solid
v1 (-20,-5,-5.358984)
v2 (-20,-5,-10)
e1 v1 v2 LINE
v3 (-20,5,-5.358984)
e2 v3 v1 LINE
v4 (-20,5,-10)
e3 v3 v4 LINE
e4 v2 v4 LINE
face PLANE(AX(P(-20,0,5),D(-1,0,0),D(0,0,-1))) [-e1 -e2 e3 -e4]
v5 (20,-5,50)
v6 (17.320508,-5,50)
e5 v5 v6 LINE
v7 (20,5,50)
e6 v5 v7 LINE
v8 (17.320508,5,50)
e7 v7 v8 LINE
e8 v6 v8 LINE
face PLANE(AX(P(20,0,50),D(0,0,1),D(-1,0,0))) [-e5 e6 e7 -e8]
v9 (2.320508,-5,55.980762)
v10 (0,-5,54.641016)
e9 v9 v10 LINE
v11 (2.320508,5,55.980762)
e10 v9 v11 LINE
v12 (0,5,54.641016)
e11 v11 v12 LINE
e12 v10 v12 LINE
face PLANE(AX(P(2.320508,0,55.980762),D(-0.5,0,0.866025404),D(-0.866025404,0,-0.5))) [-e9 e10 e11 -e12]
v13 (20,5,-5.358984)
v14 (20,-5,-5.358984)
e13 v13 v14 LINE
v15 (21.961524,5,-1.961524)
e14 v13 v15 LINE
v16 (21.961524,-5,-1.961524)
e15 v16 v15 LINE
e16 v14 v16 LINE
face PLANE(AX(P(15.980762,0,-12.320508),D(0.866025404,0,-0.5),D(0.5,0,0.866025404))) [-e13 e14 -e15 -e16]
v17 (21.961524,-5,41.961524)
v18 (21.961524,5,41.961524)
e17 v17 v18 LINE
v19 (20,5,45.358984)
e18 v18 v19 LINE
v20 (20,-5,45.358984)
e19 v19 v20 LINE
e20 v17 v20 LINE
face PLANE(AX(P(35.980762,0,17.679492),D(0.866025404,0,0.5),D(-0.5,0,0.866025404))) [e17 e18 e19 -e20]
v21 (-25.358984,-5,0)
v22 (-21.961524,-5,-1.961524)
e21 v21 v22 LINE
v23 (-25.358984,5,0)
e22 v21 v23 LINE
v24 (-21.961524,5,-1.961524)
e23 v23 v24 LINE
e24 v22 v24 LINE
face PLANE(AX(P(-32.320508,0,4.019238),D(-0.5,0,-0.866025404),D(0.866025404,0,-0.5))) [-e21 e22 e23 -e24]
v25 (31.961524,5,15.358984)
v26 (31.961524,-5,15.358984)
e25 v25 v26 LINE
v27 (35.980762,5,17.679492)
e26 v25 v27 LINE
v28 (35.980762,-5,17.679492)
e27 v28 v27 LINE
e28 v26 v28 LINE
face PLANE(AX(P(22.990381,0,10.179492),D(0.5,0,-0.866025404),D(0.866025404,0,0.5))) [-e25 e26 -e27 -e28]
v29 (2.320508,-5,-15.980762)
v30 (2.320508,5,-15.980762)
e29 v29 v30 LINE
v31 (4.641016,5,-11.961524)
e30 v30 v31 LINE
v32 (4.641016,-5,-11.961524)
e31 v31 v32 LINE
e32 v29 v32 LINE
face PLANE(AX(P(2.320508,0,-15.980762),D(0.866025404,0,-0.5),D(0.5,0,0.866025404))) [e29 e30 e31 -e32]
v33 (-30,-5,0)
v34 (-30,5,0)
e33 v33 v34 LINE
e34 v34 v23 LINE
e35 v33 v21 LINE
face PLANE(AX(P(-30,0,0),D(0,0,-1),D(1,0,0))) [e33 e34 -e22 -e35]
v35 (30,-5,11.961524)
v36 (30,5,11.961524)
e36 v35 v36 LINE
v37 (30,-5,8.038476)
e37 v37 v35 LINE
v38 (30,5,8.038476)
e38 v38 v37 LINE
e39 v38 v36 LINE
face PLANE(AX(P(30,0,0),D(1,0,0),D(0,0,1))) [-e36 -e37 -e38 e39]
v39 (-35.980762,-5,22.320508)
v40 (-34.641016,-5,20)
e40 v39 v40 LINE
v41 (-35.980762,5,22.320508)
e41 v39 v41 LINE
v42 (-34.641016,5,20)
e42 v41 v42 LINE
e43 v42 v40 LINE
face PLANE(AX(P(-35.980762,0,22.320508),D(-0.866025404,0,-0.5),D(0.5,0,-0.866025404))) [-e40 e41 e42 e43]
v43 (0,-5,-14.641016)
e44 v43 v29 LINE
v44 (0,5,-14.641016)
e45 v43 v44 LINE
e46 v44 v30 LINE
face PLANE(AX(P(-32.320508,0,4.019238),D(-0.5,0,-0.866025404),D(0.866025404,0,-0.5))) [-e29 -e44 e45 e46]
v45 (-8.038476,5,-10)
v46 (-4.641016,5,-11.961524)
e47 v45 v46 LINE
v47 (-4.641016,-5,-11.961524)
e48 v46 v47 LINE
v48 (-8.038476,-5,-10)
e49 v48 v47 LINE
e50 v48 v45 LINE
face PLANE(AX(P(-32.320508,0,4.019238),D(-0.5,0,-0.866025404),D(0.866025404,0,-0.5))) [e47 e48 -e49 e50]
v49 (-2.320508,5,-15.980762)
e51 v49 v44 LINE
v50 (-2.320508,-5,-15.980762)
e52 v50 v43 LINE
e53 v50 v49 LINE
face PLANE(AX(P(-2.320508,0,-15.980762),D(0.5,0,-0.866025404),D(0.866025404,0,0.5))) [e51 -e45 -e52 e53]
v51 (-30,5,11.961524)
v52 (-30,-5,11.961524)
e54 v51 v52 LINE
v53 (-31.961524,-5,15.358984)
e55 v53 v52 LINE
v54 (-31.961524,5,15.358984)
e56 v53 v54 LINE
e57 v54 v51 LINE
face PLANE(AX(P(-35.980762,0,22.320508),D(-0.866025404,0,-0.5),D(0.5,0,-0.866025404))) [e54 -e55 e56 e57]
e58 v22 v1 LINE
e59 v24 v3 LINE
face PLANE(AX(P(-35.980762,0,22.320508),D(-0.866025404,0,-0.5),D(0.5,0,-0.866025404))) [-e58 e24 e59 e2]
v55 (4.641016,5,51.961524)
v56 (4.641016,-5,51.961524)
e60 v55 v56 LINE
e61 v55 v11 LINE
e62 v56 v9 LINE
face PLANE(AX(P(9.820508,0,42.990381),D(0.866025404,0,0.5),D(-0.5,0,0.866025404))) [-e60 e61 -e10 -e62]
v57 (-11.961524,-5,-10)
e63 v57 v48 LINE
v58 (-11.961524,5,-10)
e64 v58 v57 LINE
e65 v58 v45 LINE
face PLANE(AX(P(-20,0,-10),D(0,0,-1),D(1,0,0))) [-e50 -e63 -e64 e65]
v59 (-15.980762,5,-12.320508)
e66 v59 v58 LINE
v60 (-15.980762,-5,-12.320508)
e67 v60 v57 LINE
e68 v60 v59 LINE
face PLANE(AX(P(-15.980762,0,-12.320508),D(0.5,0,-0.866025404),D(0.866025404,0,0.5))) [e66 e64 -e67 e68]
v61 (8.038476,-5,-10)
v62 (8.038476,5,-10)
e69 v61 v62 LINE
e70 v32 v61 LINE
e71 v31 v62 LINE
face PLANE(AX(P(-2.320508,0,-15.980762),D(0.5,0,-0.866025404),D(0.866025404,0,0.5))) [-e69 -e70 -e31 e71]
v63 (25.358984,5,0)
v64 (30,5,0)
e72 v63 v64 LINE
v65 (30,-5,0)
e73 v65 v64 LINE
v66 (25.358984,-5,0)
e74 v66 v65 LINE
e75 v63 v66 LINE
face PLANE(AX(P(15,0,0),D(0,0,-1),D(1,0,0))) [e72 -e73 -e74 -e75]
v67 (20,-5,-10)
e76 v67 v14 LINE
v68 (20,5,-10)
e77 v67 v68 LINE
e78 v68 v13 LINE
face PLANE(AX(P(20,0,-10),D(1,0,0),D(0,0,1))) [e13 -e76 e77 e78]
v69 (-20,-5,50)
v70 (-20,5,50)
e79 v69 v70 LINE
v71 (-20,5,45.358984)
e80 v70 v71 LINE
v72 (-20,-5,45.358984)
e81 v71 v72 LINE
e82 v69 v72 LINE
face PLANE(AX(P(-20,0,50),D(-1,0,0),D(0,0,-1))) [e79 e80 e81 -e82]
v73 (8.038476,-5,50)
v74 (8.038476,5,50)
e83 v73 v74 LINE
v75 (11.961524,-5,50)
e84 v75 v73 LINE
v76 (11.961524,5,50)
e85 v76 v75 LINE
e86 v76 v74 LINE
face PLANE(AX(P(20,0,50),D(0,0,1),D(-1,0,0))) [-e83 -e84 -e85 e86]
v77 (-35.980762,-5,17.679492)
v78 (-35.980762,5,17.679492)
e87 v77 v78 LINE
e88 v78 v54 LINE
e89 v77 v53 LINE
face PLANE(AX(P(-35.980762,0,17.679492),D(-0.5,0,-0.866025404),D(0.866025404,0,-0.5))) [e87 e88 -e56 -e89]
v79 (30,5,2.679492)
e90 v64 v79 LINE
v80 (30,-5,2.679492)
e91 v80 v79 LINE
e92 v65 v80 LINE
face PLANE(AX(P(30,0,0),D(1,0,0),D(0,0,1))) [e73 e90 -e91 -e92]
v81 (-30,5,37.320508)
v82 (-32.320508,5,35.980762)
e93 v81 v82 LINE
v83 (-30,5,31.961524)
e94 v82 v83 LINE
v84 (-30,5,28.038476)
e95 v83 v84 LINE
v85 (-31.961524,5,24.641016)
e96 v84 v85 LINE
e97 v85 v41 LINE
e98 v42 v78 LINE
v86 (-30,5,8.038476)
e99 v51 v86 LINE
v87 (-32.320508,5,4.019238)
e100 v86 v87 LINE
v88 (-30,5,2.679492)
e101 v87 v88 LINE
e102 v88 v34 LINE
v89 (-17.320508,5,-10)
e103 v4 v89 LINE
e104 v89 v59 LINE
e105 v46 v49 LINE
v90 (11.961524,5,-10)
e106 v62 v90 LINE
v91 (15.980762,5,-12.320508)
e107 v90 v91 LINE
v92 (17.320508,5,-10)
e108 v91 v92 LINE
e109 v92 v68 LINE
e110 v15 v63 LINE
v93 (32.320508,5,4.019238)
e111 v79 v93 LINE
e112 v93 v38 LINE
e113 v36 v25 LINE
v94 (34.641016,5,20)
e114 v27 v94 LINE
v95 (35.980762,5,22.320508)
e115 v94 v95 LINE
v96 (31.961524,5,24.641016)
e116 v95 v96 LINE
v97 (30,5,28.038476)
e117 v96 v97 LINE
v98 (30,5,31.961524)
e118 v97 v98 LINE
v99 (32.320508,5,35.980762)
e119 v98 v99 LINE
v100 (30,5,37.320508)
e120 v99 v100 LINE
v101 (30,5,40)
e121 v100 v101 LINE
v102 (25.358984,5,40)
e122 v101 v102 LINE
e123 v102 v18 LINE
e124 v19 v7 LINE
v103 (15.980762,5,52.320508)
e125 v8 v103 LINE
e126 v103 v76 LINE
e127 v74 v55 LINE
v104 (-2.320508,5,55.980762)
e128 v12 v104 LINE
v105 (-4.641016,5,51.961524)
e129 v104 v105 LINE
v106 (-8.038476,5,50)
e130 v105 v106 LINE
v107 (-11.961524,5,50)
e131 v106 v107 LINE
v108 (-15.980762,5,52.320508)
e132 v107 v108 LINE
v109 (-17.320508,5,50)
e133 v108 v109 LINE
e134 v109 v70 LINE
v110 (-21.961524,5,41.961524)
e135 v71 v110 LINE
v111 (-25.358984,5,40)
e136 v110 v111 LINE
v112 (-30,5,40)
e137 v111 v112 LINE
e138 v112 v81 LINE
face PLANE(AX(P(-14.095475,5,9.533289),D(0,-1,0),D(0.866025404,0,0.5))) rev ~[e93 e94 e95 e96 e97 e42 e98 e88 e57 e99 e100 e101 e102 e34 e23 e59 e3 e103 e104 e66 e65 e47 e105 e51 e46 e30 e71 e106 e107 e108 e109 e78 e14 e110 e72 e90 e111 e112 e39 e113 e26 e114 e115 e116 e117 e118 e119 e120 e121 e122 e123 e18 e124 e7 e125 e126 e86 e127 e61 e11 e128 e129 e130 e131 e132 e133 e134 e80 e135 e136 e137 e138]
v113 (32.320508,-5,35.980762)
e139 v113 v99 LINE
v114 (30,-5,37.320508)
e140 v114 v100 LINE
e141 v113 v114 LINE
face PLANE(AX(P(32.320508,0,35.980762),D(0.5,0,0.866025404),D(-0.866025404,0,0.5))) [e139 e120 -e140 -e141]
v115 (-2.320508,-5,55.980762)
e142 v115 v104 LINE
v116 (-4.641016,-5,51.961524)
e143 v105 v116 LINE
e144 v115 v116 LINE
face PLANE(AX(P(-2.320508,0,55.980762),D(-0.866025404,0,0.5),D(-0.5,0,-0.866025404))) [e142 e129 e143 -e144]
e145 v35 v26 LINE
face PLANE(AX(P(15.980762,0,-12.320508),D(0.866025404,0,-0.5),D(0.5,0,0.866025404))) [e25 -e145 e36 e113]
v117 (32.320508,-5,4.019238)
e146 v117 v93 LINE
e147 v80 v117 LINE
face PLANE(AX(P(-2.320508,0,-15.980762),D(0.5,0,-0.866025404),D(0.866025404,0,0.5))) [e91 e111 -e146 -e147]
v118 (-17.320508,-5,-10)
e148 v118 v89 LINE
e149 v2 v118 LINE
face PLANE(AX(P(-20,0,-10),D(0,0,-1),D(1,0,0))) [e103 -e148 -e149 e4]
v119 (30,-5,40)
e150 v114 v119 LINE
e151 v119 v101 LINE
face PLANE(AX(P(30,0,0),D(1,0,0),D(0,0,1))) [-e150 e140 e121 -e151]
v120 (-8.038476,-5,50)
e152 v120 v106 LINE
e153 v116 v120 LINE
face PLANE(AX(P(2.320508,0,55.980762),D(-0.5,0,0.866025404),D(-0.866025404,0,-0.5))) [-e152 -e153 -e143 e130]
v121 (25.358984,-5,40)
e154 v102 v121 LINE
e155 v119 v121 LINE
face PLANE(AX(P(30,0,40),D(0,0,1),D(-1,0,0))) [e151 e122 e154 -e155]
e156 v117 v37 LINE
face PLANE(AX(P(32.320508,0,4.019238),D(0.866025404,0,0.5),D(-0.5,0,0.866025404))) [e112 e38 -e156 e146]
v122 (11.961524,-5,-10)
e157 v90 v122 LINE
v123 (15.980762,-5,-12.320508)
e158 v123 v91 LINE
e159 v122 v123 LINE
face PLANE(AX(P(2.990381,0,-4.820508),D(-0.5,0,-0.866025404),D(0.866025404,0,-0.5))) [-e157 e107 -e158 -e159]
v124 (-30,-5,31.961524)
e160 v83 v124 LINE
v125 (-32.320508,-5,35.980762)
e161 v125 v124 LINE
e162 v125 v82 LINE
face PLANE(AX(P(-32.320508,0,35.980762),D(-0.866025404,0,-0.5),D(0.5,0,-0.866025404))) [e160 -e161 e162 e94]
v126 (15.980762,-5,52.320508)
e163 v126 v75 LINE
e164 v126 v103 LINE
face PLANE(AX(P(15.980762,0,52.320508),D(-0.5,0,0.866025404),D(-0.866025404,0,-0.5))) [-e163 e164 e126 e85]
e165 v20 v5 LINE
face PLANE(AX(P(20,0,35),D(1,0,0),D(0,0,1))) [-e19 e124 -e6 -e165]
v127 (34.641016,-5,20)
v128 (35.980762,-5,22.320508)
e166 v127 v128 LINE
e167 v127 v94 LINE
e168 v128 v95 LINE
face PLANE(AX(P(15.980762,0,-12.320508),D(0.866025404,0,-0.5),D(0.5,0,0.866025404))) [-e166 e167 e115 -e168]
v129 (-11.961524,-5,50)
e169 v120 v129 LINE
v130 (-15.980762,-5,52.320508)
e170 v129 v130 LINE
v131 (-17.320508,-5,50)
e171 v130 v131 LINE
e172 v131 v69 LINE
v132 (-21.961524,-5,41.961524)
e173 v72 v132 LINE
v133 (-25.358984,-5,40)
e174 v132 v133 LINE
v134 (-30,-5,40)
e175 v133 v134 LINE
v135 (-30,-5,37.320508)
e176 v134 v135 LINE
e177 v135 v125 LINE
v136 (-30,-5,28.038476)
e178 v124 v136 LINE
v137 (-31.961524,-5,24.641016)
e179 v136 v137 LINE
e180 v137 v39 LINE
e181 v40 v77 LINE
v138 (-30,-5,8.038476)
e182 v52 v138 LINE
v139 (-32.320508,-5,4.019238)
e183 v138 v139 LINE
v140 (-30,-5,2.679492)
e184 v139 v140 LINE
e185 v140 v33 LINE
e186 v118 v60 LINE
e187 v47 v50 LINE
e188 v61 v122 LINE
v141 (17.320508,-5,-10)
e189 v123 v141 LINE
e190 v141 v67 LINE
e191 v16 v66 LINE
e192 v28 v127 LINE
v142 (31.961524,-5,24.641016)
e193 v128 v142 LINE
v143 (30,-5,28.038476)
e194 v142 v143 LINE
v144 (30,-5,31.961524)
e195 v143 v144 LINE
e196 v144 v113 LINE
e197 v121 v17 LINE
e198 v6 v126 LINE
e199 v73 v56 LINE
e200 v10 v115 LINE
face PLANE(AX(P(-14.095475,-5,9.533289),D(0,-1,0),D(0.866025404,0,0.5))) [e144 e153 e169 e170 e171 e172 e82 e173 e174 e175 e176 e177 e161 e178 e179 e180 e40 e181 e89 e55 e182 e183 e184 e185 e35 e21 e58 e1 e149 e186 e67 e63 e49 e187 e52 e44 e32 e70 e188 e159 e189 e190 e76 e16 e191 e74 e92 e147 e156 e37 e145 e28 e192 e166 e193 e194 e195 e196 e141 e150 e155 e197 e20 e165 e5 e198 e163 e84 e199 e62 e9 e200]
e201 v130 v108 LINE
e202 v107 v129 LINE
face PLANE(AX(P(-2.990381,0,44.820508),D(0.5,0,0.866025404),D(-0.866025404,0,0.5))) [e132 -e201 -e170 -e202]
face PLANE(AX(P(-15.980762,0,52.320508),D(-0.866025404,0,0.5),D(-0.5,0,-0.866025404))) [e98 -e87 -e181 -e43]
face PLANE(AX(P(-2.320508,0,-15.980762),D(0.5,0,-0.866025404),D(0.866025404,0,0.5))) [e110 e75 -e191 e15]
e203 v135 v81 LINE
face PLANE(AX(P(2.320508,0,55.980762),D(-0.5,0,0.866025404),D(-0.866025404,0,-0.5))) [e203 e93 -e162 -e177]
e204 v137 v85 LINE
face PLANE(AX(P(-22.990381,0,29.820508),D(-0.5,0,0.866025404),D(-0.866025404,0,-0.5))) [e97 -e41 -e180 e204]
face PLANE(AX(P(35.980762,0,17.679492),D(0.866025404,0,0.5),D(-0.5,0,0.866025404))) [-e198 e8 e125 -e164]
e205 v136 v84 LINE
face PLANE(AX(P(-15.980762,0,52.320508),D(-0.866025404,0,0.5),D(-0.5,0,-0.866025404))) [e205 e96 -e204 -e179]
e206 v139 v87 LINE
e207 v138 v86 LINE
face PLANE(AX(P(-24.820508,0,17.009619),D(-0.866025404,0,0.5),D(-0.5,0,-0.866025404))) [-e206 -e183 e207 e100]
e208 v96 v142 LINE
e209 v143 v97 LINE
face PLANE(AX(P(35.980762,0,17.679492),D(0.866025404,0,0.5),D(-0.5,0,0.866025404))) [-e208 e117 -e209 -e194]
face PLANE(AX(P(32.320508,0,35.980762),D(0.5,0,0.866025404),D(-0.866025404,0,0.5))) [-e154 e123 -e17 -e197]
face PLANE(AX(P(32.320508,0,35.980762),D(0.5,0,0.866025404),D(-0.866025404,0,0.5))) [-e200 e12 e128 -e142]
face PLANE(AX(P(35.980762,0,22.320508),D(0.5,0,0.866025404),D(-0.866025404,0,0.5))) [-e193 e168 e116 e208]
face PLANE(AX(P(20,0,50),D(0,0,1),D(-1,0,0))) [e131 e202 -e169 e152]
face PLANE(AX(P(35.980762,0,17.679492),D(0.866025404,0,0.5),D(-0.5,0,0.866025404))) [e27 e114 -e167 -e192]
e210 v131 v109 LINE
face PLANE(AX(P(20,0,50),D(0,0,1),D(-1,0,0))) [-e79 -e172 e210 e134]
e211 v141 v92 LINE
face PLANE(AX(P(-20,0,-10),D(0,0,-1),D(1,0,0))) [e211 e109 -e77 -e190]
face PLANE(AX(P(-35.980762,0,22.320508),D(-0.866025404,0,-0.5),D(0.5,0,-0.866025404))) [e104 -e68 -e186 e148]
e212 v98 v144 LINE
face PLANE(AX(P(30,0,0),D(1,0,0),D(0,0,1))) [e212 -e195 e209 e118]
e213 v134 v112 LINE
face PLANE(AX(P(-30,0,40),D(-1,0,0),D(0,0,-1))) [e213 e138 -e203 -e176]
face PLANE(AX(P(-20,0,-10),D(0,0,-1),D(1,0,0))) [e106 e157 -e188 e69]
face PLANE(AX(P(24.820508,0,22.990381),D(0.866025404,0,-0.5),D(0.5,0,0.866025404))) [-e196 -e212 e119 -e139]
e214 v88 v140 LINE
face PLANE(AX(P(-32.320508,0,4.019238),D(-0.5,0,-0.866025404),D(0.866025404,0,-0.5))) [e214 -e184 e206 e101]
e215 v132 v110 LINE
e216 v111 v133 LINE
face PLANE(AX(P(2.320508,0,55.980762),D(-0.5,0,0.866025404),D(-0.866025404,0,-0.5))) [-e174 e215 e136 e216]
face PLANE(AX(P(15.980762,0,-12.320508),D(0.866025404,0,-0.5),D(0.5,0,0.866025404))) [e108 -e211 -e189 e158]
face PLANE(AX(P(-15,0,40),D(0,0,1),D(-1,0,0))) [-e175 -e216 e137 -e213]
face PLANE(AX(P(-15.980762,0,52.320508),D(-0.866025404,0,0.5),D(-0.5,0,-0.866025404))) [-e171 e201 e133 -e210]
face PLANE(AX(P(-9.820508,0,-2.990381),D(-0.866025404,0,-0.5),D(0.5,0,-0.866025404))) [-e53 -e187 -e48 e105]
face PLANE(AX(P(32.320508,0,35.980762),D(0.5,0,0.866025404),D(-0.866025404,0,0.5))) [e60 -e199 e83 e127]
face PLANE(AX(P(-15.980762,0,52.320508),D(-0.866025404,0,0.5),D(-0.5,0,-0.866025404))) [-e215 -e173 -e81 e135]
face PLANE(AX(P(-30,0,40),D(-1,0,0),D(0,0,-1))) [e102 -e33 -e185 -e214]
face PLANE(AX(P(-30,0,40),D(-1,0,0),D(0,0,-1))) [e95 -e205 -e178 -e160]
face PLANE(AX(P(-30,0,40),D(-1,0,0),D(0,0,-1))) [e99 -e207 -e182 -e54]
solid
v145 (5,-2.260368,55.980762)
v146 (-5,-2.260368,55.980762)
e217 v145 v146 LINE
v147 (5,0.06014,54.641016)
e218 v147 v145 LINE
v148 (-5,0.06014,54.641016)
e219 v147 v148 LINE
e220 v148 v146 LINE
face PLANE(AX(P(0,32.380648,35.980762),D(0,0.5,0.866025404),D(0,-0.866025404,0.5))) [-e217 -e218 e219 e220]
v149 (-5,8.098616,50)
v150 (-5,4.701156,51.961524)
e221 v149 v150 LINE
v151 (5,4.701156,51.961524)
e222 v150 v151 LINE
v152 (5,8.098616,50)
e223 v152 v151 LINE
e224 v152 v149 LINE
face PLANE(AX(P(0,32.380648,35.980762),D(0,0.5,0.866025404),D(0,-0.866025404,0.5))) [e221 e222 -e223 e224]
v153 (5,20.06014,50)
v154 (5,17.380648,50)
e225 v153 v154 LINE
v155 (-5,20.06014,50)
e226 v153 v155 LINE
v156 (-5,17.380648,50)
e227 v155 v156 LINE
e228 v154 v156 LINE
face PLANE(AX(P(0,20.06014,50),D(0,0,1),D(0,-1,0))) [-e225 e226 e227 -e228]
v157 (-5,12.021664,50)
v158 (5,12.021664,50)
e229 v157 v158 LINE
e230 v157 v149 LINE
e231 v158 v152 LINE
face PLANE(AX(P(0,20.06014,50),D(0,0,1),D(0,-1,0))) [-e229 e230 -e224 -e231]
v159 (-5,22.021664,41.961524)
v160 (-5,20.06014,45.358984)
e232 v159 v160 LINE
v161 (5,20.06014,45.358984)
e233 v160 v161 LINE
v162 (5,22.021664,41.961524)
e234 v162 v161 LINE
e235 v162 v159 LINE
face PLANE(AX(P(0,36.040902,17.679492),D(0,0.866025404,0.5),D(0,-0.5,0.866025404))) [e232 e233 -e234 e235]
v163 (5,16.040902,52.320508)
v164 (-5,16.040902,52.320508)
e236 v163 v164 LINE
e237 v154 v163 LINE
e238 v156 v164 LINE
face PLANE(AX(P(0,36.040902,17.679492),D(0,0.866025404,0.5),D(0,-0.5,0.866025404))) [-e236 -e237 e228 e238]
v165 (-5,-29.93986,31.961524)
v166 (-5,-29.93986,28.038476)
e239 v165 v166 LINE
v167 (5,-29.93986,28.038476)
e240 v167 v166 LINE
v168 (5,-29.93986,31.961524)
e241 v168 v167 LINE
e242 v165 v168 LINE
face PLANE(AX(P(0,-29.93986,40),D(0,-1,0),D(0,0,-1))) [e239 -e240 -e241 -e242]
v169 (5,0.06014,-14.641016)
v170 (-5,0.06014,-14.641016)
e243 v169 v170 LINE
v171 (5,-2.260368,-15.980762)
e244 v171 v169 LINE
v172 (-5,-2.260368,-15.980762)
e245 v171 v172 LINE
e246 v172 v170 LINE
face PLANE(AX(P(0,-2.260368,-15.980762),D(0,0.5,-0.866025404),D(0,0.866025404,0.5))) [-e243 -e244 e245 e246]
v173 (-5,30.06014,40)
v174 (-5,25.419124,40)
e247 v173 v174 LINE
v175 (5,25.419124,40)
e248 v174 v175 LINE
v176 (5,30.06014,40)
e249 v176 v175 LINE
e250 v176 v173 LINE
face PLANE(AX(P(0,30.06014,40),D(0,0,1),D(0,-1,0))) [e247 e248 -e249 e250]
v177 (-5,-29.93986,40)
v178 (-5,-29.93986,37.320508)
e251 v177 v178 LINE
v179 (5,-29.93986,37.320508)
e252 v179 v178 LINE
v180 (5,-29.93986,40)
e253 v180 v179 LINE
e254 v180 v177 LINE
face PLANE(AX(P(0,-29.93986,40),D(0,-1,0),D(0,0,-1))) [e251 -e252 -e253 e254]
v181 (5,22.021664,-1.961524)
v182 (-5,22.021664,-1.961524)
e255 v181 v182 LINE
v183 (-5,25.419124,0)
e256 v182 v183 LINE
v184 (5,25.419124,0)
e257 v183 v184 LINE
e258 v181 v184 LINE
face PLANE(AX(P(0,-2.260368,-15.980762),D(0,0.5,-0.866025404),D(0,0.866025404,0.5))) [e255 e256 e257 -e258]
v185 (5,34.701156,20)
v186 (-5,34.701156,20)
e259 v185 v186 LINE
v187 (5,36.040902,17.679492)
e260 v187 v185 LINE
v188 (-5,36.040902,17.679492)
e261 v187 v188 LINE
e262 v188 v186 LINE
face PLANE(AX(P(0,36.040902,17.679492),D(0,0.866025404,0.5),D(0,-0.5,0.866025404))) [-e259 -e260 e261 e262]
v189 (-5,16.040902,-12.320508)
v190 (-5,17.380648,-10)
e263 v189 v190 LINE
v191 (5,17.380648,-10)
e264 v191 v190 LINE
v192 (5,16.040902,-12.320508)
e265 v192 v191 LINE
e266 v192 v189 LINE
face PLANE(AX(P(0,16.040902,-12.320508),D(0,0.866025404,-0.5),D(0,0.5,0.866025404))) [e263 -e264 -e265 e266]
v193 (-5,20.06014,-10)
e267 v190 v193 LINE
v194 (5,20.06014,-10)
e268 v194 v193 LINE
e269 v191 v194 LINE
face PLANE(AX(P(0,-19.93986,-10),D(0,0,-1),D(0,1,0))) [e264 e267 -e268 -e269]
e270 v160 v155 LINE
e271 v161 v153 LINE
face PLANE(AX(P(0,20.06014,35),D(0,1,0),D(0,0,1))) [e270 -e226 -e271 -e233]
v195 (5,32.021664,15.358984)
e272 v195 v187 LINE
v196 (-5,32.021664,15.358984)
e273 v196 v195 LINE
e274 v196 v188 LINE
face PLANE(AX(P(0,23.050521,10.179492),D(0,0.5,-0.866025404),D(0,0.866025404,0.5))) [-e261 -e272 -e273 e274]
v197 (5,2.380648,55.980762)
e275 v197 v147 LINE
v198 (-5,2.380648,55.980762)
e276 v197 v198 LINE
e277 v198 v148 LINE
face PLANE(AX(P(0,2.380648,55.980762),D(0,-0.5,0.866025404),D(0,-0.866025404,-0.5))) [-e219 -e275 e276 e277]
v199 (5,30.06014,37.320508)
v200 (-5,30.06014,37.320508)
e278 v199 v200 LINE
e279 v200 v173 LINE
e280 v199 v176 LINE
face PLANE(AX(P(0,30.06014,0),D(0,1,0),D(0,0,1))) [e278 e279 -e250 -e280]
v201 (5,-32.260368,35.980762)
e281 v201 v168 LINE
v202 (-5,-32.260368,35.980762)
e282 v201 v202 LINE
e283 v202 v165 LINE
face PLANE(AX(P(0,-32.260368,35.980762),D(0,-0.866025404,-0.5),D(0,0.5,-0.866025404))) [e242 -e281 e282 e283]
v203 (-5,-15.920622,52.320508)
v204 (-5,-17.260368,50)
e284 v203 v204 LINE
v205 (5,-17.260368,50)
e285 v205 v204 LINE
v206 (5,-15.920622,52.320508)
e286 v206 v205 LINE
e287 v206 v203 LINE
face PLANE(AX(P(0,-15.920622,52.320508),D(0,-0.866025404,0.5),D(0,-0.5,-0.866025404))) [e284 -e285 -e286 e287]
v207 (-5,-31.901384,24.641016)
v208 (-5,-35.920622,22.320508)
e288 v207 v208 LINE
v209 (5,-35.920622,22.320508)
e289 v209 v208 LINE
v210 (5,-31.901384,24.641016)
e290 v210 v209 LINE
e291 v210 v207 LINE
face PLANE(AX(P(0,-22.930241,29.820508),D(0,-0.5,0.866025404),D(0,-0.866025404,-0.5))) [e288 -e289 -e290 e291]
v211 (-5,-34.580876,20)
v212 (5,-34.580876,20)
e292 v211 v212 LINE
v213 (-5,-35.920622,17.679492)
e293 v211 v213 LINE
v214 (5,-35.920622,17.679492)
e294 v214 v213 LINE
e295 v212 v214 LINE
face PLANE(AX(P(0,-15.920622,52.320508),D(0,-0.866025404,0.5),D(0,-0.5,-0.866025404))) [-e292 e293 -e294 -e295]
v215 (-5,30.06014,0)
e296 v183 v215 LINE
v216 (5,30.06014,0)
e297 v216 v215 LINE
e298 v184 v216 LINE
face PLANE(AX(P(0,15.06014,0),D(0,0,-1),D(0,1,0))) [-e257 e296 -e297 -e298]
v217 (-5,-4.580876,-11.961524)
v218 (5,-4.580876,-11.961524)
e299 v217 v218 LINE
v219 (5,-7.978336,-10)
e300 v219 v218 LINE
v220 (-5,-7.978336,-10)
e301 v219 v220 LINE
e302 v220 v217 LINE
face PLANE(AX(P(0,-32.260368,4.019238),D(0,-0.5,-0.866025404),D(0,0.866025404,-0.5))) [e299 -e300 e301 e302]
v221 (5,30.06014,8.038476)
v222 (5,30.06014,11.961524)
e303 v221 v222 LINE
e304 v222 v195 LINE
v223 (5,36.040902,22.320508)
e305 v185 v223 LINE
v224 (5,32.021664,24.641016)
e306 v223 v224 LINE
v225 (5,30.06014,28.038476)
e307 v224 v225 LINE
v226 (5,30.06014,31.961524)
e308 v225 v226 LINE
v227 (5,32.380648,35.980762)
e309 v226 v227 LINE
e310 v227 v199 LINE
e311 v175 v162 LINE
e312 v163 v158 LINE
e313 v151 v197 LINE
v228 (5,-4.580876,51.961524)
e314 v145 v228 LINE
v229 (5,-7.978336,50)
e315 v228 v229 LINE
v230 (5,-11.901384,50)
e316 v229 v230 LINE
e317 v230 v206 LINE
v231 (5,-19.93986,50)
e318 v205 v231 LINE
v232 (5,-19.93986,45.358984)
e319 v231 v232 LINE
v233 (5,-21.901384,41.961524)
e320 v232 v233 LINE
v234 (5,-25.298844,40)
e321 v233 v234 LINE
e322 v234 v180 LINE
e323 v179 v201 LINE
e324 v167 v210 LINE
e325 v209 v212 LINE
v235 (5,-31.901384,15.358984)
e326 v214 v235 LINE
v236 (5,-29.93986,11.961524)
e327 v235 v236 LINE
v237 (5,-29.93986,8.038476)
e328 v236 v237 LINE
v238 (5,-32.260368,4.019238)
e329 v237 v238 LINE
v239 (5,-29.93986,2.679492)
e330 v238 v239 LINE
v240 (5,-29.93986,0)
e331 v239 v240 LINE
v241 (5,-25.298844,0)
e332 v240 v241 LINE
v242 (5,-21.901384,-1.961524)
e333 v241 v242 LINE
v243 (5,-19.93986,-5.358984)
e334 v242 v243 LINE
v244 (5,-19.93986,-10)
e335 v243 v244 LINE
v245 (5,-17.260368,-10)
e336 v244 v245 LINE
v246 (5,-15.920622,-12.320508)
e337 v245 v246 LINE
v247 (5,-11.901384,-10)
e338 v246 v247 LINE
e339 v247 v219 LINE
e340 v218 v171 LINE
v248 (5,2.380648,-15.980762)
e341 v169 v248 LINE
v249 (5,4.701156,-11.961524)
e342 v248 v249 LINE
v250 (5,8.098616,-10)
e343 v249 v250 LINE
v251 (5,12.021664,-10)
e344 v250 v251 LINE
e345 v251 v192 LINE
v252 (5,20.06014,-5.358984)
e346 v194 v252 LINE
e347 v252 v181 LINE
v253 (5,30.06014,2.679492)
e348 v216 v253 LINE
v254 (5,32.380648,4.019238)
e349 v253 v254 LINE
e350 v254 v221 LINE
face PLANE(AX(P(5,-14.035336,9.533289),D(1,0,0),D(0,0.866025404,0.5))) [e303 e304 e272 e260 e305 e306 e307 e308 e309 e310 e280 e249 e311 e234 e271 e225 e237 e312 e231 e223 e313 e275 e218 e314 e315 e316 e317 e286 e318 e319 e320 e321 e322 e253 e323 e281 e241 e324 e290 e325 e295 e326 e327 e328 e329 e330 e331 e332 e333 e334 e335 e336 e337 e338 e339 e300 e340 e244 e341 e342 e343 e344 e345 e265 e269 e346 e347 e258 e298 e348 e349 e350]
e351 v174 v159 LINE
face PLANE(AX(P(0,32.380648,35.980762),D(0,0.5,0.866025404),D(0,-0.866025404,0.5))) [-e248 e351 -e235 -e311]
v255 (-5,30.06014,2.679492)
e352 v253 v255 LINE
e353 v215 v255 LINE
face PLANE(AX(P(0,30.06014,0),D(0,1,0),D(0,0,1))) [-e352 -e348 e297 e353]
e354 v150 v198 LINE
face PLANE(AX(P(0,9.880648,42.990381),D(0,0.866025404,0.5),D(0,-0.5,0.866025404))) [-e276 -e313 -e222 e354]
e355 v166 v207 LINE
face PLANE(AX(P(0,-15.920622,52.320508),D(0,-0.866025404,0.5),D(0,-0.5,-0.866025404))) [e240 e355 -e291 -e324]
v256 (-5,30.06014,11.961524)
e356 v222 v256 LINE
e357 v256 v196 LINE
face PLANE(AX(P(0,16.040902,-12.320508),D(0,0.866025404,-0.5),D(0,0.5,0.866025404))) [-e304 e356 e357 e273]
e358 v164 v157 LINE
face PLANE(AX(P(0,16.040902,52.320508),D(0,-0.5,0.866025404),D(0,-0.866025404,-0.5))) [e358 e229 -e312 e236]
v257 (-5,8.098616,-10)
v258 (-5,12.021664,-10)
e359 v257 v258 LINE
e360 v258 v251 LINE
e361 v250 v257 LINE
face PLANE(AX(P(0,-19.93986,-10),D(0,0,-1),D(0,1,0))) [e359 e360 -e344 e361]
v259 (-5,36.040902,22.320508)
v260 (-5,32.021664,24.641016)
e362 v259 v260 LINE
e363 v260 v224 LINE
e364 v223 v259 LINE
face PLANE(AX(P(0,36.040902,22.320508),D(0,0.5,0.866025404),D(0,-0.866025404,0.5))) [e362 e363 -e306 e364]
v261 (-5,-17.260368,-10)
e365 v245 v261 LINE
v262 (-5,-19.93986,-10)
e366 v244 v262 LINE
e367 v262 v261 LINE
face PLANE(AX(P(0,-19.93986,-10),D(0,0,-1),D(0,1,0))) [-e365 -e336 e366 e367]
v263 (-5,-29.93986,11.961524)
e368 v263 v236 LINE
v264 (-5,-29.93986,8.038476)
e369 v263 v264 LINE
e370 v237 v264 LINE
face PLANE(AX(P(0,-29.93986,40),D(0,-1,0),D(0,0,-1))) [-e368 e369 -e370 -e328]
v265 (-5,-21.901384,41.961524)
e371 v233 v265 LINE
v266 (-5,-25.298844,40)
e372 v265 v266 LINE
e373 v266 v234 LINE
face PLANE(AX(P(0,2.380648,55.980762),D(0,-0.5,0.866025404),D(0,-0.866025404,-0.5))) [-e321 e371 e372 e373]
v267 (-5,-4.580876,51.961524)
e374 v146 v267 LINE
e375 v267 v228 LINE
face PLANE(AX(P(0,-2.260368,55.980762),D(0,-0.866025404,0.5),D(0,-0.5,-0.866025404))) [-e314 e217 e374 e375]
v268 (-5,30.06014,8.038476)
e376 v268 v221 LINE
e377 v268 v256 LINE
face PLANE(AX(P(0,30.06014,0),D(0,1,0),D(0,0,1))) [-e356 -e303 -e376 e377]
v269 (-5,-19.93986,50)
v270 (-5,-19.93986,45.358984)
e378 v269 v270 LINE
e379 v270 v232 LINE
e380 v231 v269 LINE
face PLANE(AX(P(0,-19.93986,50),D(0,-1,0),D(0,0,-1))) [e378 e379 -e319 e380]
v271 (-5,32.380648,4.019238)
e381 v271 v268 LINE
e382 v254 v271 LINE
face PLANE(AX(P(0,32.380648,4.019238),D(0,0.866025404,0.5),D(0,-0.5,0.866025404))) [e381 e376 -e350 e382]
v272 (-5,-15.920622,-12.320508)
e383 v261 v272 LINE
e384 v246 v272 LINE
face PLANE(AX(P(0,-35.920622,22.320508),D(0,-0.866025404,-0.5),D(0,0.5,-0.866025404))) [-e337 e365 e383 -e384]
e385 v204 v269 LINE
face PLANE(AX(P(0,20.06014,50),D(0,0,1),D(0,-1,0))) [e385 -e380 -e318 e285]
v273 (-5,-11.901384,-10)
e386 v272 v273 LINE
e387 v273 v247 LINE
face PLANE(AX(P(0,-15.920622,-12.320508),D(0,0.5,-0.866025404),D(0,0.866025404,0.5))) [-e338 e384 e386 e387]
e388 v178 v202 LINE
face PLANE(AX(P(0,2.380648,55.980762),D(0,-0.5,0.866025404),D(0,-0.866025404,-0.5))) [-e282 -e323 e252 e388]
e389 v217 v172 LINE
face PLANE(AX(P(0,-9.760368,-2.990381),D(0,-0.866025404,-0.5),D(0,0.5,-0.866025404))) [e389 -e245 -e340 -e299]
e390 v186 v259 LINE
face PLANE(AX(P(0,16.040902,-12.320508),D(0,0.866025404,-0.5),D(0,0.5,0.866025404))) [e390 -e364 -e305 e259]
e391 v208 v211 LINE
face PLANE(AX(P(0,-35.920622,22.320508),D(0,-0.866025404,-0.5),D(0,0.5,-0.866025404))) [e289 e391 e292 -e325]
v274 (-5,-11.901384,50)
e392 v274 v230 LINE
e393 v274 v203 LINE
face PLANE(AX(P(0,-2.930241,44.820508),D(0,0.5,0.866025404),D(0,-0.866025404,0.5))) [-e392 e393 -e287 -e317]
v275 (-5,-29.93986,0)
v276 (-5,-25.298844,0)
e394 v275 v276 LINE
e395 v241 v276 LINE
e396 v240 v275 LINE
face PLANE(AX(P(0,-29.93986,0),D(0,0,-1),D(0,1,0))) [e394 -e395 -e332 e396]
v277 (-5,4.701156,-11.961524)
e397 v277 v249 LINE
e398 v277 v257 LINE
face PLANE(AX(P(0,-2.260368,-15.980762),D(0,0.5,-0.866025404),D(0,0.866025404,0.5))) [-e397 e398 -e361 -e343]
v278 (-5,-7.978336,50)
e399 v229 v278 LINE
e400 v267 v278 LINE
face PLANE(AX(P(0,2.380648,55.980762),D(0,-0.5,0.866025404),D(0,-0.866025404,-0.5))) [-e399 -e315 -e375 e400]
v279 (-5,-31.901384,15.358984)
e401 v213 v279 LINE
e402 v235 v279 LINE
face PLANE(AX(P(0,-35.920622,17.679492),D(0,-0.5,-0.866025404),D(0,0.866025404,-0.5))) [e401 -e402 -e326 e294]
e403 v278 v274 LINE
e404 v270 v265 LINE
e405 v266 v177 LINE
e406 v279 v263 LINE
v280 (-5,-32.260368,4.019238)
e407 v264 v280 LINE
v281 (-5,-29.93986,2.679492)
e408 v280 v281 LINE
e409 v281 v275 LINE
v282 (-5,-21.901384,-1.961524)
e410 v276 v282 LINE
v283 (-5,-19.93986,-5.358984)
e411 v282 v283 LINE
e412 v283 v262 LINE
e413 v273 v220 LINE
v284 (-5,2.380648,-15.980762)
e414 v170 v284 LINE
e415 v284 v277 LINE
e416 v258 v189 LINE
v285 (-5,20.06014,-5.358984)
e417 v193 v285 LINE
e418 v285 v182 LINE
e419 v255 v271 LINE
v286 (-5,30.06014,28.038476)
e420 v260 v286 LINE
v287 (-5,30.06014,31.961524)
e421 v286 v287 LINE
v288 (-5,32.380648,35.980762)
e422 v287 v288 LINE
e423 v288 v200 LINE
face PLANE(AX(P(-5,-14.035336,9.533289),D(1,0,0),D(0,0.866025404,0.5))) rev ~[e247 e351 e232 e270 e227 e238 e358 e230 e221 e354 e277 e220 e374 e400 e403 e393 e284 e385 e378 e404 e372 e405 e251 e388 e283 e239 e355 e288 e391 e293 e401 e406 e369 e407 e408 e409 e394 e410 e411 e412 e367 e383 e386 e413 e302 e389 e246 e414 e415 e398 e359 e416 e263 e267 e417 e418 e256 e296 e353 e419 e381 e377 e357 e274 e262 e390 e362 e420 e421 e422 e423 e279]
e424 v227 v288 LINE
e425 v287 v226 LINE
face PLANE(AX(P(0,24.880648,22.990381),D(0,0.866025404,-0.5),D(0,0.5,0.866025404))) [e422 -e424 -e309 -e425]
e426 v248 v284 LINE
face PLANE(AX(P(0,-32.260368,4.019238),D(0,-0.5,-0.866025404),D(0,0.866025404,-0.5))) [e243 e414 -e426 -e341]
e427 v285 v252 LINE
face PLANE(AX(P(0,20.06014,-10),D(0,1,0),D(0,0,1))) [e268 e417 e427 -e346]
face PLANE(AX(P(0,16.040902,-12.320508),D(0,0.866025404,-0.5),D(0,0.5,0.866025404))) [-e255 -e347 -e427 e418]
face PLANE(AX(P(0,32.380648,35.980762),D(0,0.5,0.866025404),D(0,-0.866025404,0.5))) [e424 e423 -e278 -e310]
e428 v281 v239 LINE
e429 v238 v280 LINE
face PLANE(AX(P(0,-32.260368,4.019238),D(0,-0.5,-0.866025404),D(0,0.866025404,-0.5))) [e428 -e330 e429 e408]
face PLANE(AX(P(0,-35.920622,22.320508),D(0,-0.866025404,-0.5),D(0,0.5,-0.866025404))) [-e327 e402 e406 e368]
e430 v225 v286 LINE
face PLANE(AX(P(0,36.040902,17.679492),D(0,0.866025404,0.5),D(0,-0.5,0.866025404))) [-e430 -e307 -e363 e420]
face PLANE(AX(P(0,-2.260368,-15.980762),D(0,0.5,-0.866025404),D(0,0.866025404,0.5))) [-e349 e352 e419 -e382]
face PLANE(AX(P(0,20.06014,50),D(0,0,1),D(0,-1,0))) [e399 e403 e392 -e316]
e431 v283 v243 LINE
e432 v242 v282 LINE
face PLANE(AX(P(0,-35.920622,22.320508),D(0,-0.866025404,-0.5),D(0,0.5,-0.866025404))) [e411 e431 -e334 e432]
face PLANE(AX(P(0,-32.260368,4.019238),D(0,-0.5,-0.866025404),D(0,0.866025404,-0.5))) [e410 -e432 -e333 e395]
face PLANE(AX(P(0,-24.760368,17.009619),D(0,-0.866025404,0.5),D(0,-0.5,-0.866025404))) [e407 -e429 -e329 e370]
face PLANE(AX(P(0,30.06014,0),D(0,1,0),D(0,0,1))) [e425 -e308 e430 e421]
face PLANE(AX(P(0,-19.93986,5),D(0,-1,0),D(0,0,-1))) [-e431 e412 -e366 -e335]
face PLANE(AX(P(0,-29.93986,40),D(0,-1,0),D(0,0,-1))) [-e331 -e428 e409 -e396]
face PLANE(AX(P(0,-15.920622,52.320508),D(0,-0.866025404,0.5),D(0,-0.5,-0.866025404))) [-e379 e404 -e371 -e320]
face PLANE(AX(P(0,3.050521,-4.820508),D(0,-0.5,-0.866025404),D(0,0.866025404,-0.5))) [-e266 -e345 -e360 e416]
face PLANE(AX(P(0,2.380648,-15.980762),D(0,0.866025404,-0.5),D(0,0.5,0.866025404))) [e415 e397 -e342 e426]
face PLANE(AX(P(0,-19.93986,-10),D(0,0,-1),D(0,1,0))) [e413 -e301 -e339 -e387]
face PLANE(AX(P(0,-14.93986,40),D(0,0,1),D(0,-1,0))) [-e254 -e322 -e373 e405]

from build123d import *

# Parameters (mm, degrees)
F1_DEPTH = 5
F2_COUNT = 12
F4_DEPTH = 5
F5_COUNT = 12


with BuildPart() as f1:
    # F0 (on Front) → F1 (new body, symmetric)
    with BuildSketch(Plane.XZ):
        with BuildLine():
            Line((-30, 0), (0, 0))
            Line((0, 0), (0, 20))
            ThreePointArc((0, 20), (-17.5, 22.5), (-15, 40))
            Line((-15, 40), (-30, 40))
            Line((-30, 40), (-30, 0))
        make_face()
    extrude(amount=F1_DEPTH, both=True)

    # F2: F1 ×12 about axis
    f2_axis = Axis((0, 0, 20), (0, 1, 0))


with BuildPart() as f1_1:
    add(f1.part)
    for i in range(1, F2_COUNT):
        add(f1.part.rotate(f2_axis, i * 360 / F2_COUNT))


with BuildPart() as f4:
    # F3 (on Right) → F4 (new body, symmetric)
    with BuildSketch(Plane.YZ):
        with BuildLine():
            Line((-29.9398601055, 0), (0.0601398945, 0))
            Line((0.0601398945, 0), (0.0601398945, 20))
            ThreePointArc((0.0601398945, 20), (-17.4398601055, 22.5), (-14.9398601055, 40))
            Line((-14.9398601055, 40), (-29.9398601055, 40))
            Line((-29.9398601055, 40), (-29.9398601055, 0))
        make_face()
    extrude(amount=F4_DEPTH, both=True)

    # F5: F4 ×12 about axis
    f5_axis = Axis((0, 0.0601398945, 20), (-1, 0, 0))


with BuildPart() as f4_1:
    add(f4.part)
    for i in range(1, F5_COUNT):
        add(f4.part.rotate(f5_axis, i * 360 / F5_COUNT))


solid = Compound([f1_1.part, f4_1.part])
